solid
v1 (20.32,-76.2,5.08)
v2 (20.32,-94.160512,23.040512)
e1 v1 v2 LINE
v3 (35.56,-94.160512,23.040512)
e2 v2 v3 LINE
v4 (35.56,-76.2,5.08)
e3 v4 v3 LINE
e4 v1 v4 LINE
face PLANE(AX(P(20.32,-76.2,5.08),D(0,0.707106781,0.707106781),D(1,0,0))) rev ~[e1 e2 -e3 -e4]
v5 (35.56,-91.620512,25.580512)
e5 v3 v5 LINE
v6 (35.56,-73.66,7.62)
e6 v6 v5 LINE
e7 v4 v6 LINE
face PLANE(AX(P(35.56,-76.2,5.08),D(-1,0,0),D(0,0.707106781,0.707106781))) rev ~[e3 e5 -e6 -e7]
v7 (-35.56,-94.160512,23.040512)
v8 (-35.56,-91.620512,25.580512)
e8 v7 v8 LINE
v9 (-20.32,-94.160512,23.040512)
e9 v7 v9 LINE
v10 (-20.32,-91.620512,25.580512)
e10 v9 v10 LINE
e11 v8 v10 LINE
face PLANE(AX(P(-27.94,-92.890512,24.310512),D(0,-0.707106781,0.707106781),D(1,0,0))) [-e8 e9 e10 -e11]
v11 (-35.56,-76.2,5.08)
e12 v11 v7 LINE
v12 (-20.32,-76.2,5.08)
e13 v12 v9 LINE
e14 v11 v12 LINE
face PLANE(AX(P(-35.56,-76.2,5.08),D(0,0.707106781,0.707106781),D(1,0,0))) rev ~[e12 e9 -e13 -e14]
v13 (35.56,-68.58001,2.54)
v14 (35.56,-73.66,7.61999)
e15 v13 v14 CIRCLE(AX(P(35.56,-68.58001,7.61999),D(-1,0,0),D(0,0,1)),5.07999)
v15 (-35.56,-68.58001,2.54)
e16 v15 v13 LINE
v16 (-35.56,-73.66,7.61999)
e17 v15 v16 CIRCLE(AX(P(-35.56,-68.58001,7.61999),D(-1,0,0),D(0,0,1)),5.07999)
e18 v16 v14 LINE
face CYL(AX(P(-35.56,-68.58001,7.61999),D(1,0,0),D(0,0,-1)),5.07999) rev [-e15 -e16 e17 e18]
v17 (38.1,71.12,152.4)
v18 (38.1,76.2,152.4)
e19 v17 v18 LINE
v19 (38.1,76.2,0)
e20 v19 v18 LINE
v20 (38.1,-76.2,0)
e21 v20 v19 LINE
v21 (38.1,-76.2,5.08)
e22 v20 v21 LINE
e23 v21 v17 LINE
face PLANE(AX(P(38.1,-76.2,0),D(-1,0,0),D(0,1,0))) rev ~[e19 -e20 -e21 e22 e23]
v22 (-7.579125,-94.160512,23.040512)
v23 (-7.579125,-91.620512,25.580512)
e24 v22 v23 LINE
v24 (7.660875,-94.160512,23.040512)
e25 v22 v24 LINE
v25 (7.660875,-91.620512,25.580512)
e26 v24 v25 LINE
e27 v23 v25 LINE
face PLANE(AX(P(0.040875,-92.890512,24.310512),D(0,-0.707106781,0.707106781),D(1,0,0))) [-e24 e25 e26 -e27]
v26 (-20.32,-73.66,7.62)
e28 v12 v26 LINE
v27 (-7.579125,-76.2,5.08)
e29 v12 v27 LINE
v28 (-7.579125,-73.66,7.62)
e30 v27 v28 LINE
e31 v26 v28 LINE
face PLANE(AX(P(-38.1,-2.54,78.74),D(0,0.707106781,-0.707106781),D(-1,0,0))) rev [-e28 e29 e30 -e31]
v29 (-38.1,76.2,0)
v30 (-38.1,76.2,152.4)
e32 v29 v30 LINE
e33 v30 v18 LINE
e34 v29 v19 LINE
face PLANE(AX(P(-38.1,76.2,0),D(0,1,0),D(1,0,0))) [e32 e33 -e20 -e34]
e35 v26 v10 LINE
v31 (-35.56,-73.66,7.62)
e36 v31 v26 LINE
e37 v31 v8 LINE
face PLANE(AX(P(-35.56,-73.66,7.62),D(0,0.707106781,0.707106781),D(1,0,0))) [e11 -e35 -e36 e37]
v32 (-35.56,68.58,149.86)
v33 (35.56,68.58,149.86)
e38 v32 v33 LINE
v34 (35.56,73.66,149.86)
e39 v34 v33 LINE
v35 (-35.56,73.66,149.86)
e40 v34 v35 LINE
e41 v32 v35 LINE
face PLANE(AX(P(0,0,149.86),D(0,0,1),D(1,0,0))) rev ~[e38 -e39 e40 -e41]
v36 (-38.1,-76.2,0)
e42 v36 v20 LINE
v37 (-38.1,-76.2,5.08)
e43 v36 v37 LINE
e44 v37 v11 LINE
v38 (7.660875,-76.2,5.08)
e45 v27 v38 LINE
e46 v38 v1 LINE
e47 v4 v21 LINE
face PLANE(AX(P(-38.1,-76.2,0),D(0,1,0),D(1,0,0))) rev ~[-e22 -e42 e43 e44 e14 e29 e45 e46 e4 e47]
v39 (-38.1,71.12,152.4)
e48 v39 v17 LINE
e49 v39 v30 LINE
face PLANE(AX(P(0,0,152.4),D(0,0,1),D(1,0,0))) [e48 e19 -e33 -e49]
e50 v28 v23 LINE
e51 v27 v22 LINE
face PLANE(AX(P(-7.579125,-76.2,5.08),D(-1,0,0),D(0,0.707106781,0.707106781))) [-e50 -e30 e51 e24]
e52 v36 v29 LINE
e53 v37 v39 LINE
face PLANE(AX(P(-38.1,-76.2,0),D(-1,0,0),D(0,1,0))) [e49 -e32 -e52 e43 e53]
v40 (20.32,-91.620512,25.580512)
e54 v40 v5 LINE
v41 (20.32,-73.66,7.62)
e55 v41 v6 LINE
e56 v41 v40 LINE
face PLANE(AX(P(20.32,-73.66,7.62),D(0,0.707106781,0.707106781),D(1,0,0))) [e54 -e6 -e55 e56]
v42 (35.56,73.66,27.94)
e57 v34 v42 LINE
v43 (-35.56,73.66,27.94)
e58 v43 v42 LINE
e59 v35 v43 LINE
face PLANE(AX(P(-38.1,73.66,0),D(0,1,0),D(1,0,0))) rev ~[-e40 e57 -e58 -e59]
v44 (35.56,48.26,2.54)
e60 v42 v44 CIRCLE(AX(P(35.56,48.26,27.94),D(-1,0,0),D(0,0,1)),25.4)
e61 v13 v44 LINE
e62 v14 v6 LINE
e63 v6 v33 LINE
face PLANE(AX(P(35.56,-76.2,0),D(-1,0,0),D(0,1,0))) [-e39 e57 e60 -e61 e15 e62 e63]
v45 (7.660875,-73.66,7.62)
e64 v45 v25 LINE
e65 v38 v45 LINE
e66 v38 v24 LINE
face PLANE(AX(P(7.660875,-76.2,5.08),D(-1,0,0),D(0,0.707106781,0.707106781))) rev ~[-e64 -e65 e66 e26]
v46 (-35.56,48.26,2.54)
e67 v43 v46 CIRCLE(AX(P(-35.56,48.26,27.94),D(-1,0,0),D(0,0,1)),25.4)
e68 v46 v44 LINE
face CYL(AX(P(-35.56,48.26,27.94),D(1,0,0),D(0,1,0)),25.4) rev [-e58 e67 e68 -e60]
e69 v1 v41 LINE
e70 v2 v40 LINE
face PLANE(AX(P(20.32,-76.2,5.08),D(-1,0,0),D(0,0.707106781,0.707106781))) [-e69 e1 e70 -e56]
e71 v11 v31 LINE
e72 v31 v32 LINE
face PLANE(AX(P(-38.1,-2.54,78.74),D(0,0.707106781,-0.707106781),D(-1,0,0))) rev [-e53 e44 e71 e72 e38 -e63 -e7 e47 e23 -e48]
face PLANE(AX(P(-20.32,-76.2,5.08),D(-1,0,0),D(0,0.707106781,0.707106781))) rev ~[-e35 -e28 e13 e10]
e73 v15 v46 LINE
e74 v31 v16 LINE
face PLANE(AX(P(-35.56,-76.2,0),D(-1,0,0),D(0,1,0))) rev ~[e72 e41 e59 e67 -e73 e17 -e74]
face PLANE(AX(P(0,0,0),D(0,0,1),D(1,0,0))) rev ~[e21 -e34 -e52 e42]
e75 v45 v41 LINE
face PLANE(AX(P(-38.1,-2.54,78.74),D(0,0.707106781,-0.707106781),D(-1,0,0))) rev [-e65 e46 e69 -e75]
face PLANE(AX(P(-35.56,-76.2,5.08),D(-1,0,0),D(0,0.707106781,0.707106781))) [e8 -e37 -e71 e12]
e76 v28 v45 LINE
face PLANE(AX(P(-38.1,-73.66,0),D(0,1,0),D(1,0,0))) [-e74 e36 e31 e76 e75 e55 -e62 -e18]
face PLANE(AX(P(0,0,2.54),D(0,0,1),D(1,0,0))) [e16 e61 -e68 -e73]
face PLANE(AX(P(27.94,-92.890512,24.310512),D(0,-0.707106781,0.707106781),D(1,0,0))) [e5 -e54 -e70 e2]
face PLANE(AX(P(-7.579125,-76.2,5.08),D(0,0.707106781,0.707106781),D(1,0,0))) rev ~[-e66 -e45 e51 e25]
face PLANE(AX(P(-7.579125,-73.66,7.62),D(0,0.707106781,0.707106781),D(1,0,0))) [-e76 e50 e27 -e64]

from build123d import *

# Parameters (mm, degrees)
F0_W     = 76.2
F0_H     = 152.4
F1_DEPTH = 152.4
F2_SIZE  = 147.32
F3_T     = -2.54
F4_R     = 25.4
F5_R     = 5.07999
F6_W     = 15.24
F6_H     = 3.5921024484
F7_DEPTH = 25.4


# Not quite as in the source:
# - a fillet or chamfer is up to 0.001 mm smaller than in the source, because OpenCascade refuses the exact size


with BuildPart() as f1:
    # F0 (on Top) → F1 (new body)
    with BuildSketch(Plane.XY):
        Rectangle(F0_W, F0_H)
    extrude(amount=F1_DEPTH)

    # F2
    f2_edges = [f1.edges().sort_by_distance(p)[0] for p in [
        (0, -76.2, 152.4),
    ]]
    chamfer(f2_edges, length=F2_SIZE)

    # F3
    f3_openings = [f1.faces().sort_by_distance(p)[0] for p in [
        (0, -2.54, 78.74),
    ]]
    offset(amount=F3_T, openings=f3_openings)

    # F4
    f4_edges = [f1.edges().sort_by_distance(p)[0] for p in [
        (0, 73.66, 2.54),
    ]]
    fillet(f4_edges, radius=F4_R)

    # F5 (radius 5.08 in the source; OpenCascade refuses exactly that, so slightly less here)
    f5_edges = [f1.edges().sort_by_distance(p)[0] for p in [
        (0, -73.66, 2.54),
    ]]
    fillet(f5_edges, radius=F5_R)

    # F6 (on face) → F7 (join)
    with BuildSketch(Plane(origin=(0, -40.64, 40.64), x_dir=(1, 0, 0), z_dir=(0, -0.7071067812, 0.7071067812))):
        with Locations((-27.94, -48.4933830538)):
            Rectangle(F6_W, F6_H)
        with Locations((27.94, -48.4933830538)):
            Rectangle(F6_W, F6_H)
        with Locations((0.0408754674, -48.4933830538)):
            Rectangle(F6_W, F6_H)
    extrude(amount=F7_DEPTH)


solid = f1.part
